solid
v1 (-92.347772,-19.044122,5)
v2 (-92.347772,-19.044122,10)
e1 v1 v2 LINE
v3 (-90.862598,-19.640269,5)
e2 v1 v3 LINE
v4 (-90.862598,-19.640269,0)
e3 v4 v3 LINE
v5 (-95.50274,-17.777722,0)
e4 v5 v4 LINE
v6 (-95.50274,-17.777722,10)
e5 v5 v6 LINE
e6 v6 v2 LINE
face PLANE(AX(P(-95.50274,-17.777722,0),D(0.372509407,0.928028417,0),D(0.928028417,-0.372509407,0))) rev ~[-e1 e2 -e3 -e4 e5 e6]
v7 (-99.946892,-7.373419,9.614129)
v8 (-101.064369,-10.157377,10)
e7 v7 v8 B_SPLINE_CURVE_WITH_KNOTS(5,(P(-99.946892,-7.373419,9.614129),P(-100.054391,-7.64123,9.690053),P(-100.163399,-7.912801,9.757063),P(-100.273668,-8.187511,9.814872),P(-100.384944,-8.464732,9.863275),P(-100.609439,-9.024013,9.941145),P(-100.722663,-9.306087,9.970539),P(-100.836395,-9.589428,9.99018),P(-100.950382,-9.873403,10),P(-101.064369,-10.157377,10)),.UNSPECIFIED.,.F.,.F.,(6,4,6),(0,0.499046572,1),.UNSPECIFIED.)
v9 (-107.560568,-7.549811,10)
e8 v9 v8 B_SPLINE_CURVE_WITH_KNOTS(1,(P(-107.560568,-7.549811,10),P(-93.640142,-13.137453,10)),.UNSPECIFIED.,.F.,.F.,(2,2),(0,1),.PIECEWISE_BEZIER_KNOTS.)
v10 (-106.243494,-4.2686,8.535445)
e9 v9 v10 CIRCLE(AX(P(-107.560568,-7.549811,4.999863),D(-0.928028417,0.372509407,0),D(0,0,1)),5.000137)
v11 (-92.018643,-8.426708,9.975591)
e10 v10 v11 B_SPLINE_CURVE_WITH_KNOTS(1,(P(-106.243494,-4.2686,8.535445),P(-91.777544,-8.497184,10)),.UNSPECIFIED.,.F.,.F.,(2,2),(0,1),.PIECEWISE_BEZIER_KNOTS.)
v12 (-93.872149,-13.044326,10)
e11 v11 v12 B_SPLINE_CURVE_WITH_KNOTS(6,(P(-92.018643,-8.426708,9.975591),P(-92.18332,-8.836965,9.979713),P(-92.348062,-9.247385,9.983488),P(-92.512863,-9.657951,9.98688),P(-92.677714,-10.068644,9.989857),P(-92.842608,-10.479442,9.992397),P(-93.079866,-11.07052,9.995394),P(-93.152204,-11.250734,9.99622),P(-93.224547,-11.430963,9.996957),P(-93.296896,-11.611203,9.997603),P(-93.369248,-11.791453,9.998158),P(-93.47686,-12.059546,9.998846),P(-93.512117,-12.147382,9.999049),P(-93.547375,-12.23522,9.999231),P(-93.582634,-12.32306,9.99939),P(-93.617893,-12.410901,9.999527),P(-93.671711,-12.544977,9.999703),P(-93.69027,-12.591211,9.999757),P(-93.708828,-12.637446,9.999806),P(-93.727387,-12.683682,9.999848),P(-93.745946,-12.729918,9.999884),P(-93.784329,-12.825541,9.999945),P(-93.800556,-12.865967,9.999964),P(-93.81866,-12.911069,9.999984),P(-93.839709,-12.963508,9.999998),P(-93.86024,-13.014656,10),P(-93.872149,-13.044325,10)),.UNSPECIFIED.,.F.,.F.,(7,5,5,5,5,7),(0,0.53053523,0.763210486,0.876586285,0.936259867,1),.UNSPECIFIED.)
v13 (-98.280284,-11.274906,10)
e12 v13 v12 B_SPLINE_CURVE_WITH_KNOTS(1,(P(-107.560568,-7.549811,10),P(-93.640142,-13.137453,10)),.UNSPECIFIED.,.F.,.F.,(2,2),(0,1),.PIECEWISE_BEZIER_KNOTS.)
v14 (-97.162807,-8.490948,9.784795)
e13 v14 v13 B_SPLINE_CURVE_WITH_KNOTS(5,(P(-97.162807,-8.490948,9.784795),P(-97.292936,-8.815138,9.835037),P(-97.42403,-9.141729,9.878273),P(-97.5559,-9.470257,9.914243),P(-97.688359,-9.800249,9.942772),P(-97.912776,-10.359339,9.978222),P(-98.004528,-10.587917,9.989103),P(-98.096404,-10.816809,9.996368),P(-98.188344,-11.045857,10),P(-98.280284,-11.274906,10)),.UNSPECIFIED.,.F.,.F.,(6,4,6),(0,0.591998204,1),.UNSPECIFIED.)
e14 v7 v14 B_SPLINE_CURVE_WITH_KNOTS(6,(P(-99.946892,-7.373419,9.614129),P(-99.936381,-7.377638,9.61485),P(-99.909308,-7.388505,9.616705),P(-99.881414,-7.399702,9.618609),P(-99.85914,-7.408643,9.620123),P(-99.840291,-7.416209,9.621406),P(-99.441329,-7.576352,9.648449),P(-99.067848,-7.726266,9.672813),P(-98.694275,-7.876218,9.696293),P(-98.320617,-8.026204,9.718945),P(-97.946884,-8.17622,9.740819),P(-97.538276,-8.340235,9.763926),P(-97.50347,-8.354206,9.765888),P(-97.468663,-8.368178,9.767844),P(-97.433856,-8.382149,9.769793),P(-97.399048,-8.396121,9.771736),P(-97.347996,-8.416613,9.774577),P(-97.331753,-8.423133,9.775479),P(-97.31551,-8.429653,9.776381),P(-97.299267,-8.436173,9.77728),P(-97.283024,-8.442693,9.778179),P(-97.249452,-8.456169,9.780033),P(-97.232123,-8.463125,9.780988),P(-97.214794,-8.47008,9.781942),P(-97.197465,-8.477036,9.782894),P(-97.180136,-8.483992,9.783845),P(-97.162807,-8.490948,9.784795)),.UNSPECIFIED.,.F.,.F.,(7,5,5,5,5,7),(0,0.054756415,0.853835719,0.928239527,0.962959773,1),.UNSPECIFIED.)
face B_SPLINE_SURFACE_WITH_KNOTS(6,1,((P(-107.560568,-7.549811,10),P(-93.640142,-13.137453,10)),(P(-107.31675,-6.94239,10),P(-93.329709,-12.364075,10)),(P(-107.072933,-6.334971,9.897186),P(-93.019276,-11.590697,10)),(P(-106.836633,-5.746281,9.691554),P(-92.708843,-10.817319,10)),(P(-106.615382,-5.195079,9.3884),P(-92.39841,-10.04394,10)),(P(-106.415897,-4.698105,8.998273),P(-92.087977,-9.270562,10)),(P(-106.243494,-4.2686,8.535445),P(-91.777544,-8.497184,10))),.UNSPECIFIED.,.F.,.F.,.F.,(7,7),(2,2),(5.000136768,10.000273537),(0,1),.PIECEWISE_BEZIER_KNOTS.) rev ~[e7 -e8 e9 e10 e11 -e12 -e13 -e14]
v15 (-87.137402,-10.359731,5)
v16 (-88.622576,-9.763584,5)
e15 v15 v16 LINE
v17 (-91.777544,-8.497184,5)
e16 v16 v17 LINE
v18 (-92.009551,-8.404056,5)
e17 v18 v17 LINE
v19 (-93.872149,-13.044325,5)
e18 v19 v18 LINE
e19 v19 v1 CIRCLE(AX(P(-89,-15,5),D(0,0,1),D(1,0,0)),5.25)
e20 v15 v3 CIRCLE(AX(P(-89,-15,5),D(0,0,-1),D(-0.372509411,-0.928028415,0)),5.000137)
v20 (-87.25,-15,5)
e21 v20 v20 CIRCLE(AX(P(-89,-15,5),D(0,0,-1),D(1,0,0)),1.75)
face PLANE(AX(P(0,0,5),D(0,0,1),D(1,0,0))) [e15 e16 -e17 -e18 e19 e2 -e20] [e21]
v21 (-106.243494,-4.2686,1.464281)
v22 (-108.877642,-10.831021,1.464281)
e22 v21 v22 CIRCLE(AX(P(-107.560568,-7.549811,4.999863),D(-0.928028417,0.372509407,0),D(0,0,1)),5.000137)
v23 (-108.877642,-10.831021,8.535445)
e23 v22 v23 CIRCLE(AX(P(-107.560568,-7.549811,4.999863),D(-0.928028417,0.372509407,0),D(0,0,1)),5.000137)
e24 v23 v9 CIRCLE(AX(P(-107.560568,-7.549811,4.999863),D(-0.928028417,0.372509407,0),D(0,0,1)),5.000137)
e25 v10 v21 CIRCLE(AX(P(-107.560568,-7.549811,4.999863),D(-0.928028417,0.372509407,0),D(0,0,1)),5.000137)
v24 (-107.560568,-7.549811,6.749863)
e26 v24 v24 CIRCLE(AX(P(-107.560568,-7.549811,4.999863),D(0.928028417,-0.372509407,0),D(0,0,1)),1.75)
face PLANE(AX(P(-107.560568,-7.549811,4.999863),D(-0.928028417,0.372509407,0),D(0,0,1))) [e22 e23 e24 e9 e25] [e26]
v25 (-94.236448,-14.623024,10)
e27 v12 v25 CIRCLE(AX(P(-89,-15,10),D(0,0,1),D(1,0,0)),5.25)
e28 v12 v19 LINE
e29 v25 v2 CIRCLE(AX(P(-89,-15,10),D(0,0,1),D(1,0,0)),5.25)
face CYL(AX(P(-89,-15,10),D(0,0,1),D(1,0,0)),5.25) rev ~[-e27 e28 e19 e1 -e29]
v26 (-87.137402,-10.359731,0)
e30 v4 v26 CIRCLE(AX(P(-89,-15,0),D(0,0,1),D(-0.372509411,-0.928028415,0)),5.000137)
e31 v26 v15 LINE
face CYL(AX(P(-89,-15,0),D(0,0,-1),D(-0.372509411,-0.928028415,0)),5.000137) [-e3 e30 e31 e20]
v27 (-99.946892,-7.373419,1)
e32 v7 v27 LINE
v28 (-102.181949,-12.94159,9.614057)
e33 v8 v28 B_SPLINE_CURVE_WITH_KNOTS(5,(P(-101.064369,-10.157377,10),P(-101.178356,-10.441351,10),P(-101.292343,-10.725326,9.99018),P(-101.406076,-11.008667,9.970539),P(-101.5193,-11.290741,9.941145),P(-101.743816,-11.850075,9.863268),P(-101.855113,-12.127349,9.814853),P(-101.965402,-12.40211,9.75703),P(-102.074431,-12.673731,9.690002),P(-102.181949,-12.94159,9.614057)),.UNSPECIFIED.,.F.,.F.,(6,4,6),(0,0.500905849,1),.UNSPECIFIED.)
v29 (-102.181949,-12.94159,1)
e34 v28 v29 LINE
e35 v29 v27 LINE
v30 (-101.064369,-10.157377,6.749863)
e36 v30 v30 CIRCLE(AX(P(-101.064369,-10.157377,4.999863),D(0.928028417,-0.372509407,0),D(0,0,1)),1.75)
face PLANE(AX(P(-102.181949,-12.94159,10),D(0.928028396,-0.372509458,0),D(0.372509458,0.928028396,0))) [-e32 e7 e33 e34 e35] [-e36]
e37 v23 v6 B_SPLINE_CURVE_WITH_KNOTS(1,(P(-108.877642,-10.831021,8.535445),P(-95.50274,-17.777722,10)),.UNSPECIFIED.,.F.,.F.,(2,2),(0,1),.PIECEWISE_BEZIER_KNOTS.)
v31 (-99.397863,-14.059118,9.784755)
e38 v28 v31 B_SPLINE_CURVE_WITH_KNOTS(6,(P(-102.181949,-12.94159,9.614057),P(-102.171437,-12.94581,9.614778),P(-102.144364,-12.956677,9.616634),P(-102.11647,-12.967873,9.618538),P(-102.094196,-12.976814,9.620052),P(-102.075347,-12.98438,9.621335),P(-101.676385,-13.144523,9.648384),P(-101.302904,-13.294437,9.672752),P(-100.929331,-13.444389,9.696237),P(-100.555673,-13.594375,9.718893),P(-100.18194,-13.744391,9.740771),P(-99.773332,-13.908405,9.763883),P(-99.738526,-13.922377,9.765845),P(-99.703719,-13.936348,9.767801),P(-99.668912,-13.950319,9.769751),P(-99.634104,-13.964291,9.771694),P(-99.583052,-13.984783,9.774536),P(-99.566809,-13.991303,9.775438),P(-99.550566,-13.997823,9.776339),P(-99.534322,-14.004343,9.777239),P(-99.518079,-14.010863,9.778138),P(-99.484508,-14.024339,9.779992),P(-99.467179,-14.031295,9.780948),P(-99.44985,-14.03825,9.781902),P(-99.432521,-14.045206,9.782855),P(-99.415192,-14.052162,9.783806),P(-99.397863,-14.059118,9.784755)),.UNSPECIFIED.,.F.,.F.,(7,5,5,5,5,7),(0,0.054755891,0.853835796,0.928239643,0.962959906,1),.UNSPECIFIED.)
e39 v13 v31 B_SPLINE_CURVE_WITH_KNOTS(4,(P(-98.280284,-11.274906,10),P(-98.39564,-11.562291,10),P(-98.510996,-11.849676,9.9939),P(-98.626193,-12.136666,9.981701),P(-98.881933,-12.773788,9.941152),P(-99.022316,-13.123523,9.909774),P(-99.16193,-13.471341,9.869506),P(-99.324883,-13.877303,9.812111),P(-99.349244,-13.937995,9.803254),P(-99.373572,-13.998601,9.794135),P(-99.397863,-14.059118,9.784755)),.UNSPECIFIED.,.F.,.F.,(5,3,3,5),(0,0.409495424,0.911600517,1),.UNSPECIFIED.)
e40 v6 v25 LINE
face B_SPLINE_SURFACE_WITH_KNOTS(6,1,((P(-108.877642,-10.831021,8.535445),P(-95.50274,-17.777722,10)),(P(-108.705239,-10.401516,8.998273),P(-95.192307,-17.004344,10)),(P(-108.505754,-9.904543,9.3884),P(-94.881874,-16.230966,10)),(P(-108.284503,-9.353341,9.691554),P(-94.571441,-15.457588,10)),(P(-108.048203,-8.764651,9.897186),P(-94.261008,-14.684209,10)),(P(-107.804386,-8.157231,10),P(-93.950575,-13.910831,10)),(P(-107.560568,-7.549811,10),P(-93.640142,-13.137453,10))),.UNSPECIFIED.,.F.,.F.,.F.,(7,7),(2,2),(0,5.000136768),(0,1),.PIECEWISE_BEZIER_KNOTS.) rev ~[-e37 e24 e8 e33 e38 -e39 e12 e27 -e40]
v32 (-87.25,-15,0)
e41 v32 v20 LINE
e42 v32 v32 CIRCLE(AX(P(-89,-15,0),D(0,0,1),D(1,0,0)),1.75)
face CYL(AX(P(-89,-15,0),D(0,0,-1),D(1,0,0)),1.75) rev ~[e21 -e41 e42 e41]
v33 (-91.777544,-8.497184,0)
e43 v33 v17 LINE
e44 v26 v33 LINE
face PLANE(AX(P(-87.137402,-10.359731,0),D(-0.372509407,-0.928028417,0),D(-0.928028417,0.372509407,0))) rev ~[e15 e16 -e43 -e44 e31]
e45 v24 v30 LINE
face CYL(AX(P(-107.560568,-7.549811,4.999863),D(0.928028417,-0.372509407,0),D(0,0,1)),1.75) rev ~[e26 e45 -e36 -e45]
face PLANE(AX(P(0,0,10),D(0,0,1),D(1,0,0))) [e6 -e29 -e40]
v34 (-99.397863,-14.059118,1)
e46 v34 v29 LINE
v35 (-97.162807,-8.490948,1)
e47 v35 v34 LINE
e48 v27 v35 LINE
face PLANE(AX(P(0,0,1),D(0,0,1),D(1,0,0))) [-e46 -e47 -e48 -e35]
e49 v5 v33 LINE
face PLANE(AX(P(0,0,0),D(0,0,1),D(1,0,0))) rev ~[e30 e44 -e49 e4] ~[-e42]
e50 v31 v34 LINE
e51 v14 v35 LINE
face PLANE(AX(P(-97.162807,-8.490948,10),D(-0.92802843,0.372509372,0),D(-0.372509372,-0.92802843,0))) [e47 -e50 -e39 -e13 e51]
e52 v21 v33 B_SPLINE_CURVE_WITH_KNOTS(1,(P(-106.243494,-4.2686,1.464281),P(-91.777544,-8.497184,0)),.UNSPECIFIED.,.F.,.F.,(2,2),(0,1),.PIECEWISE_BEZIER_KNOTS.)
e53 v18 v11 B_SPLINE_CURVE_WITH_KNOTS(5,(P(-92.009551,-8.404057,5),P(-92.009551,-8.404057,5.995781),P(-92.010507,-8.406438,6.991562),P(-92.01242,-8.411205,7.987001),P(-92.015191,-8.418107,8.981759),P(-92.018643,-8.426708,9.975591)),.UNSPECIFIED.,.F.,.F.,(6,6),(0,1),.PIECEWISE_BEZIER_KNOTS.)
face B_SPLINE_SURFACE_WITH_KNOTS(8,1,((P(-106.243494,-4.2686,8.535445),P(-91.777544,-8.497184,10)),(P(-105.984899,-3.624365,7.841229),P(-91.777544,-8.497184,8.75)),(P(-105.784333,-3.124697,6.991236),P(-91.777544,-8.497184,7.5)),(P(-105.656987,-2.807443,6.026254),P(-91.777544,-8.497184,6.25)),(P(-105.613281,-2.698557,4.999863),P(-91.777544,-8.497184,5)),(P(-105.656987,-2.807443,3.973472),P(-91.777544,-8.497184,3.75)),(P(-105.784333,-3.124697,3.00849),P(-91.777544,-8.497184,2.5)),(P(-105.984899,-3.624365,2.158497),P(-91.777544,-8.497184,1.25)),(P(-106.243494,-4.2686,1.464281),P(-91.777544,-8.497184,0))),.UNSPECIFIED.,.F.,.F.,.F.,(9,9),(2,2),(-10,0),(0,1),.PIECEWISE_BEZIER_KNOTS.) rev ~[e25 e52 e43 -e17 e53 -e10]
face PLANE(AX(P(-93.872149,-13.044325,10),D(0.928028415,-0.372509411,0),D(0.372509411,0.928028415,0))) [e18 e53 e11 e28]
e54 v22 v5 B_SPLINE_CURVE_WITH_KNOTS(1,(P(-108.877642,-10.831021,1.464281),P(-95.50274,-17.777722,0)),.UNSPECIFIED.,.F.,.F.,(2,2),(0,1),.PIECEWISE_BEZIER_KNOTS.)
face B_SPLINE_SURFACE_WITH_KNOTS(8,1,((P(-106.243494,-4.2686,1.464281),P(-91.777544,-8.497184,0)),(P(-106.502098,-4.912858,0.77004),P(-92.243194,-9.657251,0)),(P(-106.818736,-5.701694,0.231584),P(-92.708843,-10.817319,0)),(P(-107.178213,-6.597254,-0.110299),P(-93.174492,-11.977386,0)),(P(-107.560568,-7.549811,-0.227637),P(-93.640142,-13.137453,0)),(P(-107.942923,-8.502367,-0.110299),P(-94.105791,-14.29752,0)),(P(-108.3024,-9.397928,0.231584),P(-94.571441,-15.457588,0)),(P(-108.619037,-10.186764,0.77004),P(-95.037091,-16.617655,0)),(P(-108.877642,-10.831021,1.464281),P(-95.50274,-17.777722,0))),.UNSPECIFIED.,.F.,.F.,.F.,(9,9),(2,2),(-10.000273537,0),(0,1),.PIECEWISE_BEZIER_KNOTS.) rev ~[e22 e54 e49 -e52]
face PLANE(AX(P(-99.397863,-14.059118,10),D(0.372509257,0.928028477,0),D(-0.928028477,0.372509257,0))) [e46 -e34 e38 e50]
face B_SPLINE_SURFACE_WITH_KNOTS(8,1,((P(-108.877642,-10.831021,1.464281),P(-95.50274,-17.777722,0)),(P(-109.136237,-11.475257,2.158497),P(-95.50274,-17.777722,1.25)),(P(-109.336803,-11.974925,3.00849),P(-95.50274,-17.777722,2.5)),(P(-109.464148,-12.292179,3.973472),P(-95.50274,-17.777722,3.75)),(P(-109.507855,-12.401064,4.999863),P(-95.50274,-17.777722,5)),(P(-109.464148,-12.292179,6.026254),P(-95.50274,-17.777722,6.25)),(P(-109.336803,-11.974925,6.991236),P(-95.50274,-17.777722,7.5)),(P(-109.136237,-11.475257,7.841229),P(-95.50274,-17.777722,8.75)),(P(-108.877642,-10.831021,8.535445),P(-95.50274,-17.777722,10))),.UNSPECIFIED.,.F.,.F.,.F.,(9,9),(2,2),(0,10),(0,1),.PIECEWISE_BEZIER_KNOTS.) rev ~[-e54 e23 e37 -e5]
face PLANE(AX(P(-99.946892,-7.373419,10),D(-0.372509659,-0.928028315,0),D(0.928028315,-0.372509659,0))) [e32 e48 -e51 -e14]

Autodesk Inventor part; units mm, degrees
ref_plane "YZ Plane" through (0, 0, 0) normal (1, 0, 0) x (0, 1, 0)
ref_plane "XZ Plane" through (0, 0, 0) normal (0, 1, 0) x (-1, 0, 0)
ref_plane "XY Plane" through (0, 0, 0) normal (0, 0, 1) x (1, 0, 0)
ref_plane "Work Plane1" through (0, 0, 0) normal (0, 0, 1) x (1, 0, 0)
sketch "Sketch1" plane through (0, 0, 0) normal (0, 0, 1) x (1, 0, 0)
  circle A0 centre (-15, -15) radius 1.2
  circle A1 centre (-89, -15) radius 1.2
  circle A2 centre (-89, -15) radius 1.75
  line L0 (-89, -15) -> (-112.137643, -5.443064) construction
  line L1 (-87.137402, -10.359731) -> (-91.777544, -8.497184)
  line L2 (-95.50274, -17.777722) -> (-90.862598, -19.640269)
  arc A3 (-90.862598, -19.640269) -> (-87.137402, -10.359731) centre (-89, -15) ccw
  line L3 (-95.50274, -17.777722) -> (-91.777544, -8.497184)
  point P0 (-100.568822, -10.221532)
  dimension "d1" = 3.5
  dimension "d10" = 5
extrude "Extrusion1" add sketch "Sketch1" along normal blind 10 contours A3 L2 L3 L1
ref_plane "Work Plane2" through (-109.423166, -12.19008, 0) normal (-0.9280284, 0.3725094, 0) x (0, 0, 1)
sketch "Sketch3" plane through (-109.423166, -12.19008, 0) normal (-0.9280284, 0.3725094, 0) x (0, 0, 1)
  line L0 (0, 10.000274) -> (0, 0)
  line L1 (0, 0) -> (10, 0)
  line L2 (10, 10.000274) -> (10, 0)
  line L3 (0, 10.000274) -> (10, 10.000274)
  circle A0 centre (4.999863, 5.000137) radius 5.000137
  point P0 (0, 52.073903)
sketch "Sketch3 outline for Loft1" plane through (-109.423166, -12.19008, 0) normal (-0.9280284, 0.3725094, 0) x (0, 0, 1)
  circle A0 centre (4.999863, 5.000137) radius 5.000137
loft "Loft1" add profiles "Sketch3 outline for Loft1" section 2 edges at (-93.640142, -13.137453, 0) (-95.50274, -17.777722, 5) (-93.640142, -13.137453, 10) (-91.777544, -8.497184, 5)
sketch "Sketch5" plane through (0, 0, 10) normal (0, 0, 1) x (1, 0, 0)
  circle A0 centre (-89, -15) radius 5.25
  arc A1 (-90.862598, -19.640269) -> (-87.137402, -10.359731) centre (-89, -15) ccw
  point P0 (0, 0)
  dimension "d18" = 10.5
extrude "Extrusion3" cut sketch "Sketch5" against normal blind 5
sketch "Sketch6" plane through (0, 0, 10) normal (0, 0, 1) x (1, 0, 0)
  line L0 (-99.397863, -14.059118) -> (-102.181949, -12.94159)
  line L1 (-102.181949, -12.94159) -> (-99.946892, -7.373419)
  line L2 (-99.946892, -7.373419) -> (-97.162807, -8.490948)
  line L3 (-97.162807, -8.490948) -> (-99.397863, -14.059118)
  line L4 (-116.544319, -29.930925) -> (-85.605283, 47.147132)
  line L5 (-95.50274, -17.777722) -> (-92.347771, -19.044123)
  point P0 (0, 0)
  dimension "d21" = 7
  dimension "d22" = 3
  dimension "d23" = 6
  dimension "d24" = 2
extrude "Extrusion4" cut sketch "Sketch6" against normal blind 9
sketch "Sketch7" plane through (-107.560568, -7.549811, 4.999863) normal (-0.9280284, 0.3725094, 0) x (0, 0, 1)
  arc A0 (-3.535582, -3.535679) -> (3.535582, -3.535679) centre (0, 0) ccw
  point P0 (-4.999863, 47.073766)
hole "Hole1" at (-107.560568, -7.549811, 4.999863) direction (0.9280284, -0.3725094, 0) diameter 3.5 depth 7
sketch "Sketch8" plane through (0, 0, 10) normal (0, 0, 1) x (1, 0, 0)
  line L0 (-88.622575, -9.763584) -> (-91.777544, -8.497184)
  arc A0 (-88.622575, -9.763584) -> (-93.043836, -11.651883) centre (-89, -15) ccw
  spline S0 degree 2 poles (-93.872149, -13.044325) (-93.566724, -12.283424) (-93.043836, -11.651883) knots 0 0 0 1 1 1 weights 1 0.98802352 1
  line L1 (-93.872149, -13.044325) -> (-92.009551, -8.404056)
  arc A1 (-88.622575, -9.763584) -> (-92.347771, -19.044123) centre (-89, -15) ccw
  line L2 (-92.009551, -8.404056) -> (-88.622575, -9.763584)
  point P0 (0, 0)
extrude "Extrusion5" cut sketch "Sketch8" against normal blind 5
properties part number "Hangar"
